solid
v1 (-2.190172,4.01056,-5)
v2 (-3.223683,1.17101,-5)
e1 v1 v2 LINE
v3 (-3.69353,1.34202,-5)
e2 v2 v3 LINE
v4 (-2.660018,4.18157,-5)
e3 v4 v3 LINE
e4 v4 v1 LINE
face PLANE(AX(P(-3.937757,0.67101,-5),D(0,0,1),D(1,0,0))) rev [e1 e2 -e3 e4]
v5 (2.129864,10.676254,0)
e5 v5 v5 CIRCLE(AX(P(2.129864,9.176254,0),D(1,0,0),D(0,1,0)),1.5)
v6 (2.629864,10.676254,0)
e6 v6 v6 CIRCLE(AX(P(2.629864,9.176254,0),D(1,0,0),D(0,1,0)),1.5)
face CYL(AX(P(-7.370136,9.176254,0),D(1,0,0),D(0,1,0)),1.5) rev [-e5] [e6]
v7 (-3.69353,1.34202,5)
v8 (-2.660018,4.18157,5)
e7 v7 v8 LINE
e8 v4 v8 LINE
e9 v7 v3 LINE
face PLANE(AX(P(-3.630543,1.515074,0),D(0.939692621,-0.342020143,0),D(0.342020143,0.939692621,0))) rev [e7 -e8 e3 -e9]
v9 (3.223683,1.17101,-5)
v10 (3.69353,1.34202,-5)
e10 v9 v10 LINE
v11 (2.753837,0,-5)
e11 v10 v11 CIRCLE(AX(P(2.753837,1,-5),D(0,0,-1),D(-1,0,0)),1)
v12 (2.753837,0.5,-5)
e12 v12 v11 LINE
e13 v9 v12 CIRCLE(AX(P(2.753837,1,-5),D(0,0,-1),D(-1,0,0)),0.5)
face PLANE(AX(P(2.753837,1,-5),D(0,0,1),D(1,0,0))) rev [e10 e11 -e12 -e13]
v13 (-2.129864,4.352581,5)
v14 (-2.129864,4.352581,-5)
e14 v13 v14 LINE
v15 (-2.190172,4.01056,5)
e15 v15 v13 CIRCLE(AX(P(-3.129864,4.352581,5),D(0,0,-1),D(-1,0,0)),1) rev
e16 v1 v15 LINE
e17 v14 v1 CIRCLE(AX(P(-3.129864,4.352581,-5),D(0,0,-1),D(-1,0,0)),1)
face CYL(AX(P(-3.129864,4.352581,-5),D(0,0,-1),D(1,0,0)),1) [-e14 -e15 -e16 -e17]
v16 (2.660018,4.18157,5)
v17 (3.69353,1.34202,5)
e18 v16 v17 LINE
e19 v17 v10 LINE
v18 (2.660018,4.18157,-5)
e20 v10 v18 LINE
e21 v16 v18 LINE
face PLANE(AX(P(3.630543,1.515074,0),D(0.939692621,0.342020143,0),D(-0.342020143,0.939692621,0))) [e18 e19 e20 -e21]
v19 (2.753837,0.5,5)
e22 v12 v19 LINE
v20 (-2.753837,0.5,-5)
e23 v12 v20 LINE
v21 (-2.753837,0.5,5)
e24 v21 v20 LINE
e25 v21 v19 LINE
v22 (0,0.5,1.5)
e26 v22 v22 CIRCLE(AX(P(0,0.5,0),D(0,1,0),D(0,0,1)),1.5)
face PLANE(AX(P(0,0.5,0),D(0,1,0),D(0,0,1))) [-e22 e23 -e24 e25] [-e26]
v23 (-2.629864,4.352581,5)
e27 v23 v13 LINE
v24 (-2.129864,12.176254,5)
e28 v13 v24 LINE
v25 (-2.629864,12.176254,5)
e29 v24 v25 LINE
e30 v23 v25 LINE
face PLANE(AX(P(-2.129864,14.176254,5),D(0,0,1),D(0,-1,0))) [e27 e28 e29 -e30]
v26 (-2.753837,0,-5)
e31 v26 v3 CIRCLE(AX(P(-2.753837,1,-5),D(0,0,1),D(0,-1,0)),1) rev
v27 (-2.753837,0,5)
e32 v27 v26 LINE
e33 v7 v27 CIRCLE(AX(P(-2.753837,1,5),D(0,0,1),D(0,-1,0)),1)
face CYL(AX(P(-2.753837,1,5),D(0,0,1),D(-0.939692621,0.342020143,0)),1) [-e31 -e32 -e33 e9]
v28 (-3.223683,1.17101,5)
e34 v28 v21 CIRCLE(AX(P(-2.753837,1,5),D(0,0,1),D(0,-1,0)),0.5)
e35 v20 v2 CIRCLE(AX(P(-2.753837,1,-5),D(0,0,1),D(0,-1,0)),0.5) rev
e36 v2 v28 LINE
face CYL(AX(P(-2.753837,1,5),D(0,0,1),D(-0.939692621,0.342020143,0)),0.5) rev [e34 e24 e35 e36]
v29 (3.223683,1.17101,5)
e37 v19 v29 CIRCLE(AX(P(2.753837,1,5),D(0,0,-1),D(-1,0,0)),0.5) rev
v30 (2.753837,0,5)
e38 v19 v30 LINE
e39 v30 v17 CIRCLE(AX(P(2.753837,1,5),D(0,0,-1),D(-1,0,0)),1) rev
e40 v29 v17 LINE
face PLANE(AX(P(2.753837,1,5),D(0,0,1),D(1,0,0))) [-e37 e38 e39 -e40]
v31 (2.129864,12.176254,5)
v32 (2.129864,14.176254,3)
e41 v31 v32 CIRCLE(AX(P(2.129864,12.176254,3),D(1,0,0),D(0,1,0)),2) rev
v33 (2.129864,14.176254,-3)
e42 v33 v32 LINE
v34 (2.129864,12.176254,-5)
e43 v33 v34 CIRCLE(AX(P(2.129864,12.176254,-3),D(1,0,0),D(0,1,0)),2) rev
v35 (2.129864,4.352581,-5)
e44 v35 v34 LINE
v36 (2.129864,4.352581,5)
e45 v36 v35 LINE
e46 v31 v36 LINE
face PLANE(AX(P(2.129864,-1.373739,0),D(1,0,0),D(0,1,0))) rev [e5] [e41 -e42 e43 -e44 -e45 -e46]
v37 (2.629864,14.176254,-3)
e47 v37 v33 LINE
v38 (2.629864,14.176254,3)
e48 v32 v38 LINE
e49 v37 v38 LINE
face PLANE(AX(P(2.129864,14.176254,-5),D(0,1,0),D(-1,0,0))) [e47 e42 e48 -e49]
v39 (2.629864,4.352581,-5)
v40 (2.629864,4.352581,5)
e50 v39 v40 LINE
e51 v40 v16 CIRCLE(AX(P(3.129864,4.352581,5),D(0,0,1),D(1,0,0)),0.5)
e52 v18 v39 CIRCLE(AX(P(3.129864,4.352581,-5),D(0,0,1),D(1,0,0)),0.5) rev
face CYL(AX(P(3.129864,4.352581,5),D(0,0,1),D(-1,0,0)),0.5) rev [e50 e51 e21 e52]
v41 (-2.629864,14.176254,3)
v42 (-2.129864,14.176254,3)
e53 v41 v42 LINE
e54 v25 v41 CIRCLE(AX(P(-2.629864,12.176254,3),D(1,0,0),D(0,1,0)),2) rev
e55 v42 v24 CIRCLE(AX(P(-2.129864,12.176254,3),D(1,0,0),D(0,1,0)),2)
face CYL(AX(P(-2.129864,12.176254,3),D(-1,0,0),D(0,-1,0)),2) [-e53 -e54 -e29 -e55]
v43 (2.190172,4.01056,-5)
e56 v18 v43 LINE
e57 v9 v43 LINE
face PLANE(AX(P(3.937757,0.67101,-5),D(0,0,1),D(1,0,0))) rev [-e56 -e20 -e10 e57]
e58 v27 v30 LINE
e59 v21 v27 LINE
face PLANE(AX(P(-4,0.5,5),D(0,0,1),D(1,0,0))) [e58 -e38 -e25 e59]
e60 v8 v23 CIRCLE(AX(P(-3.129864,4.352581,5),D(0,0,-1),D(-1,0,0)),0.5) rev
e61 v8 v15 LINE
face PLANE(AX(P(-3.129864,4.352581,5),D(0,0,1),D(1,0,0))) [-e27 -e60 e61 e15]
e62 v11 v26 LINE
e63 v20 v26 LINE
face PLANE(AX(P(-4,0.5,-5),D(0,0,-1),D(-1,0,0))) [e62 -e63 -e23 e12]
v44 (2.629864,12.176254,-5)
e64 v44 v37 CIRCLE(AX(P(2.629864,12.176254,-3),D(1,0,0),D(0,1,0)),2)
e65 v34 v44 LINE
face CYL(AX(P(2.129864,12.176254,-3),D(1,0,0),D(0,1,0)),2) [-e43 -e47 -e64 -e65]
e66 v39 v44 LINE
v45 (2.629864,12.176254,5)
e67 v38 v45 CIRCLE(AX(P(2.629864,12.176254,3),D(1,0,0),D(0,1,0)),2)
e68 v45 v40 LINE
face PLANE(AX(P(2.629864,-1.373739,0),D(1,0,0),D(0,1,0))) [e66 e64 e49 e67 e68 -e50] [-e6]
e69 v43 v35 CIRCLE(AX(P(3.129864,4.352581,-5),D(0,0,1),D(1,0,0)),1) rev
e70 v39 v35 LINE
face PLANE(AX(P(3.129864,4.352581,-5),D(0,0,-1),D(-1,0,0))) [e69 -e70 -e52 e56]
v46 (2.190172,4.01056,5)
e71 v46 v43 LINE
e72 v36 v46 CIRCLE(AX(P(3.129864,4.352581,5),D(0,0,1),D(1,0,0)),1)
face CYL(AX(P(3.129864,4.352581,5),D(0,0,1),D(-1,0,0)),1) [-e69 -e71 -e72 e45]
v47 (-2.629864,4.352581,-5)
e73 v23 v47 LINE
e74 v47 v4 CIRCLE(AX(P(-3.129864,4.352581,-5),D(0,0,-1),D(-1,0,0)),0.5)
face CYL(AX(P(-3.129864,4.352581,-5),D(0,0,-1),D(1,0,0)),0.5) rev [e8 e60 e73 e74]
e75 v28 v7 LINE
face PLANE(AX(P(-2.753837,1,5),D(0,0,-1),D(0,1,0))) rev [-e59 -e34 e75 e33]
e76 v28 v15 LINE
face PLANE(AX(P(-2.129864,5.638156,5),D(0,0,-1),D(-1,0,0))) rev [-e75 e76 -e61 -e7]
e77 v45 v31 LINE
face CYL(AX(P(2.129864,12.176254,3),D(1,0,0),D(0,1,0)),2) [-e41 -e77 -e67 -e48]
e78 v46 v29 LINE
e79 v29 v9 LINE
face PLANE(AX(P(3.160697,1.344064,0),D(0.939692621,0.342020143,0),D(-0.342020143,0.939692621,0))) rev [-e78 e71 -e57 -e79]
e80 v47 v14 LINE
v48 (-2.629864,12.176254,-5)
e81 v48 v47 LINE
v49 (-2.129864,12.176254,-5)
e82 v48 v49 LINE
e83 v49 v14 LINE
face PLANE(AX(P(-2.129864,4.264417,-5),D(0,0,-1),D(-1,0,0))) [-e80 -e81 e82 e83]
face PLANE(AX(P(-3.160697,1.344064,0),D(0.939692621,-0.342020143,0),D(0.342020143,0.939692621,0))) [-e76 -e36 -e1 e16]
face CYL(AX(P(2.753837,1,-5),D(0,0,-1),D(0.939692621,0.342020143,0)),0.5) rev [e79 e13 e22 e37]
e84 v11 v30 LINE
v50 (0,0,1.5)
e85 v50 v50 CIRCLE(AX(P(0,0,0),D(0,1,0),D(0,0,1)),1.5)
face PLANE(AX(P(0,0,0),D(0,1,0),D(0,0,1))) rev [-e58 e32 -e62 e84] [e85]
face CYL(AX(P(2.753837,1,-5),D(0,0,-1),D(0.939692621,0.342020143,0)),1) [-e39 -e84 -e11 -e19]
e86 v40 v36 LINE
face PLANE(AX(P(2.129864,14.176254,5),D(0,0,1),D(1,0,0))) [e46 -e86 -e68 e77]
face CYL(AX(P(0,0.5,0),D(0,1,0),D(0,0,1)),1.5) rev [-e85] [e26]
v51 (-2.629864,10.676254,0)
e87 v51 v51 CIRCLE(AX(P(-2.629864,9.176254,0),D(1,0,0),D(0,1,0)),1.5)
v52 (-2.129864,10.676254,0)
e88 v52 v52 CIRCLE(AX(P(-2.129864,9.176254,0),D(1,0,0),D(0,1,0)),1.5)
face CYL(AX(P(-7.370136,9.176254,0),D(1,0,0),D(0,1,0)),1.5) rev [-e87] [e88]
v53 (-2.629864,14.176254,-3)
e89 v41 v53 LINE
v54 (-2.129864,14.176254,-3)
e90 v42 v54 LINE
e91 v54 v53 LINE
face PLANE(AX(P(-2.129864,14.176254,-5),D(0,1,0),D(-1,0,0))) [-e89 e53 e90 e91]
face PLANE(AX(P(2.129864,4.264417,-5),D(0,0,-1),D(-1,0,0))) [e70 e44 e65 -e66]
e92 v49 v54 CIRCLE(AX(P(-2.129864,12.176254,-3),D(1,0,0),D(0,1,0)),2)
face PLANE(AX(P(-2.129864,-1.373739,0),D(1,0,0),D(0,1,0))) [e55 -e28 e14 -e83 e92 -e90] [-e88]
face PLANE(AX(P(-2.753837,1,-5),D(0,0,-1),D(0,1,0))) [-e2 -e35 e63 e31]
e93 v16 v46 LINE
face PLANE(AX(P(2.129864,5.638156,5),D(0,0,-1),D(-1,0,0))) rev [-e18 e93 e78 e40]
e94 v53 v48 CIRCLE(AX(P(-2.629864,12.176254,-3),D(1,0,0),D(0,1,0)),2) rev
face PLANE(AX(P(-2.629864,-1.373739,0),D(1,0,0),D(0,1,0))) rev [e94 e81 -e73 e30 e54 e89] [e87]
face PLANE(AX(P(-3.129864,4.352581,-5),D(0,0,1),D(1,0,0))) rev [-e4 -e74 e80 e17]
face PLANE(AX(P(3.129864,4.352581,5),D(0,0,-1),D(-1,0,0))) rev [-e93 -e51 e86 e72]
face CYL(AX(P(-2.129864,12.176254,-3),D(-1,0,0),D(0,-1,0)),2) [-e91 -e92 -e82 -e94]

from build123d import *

# Parameters (mm, degrees)
SKETCH_1_W               = 8
SKETCH_1_H               = 10
SKETCH_1_R               = 1.5
EXTRUDE_1_DEPTH          = 0.5
SM_START                 = -5
SM_EDGE_FLANGE_1_DEPTH   = 10
SM_EDGE_FLANGE_1_2_DEPTH = 10
SM_EDGE_FLANGE_2_DEPTH   = 10
SM_EDGE_FLANGE_2_2_DEPTH = 10
FILLET_1_R               = 2
SKETCH_18_R              = 1.5
CUT_EXTRUDE_1_DEPTH      = 10


# Read off the part's stored shape, not the designer's step: Ребро-кромка1, Ребро-кромка2
with BuildPart() as part:
    # Sketch 1 → Бобышка-Вытянуть1 (new body)
    with BuildSketch(Plane(origin=(0, 0, 0), x_dir=(1, 0, 0), z_dir=(0, 1, 0))):
        Rectangle(SKETCH_1_W, SKETCH_1_H)
        with Locations(Location((0, 0, 0), (0, 0, 270))):
            Circle(SKETCH_1_R, mode=Mode.SUBTRACT)
    extrude(amount=EXTRUDE_1_DEPTH)

    # Ребро-кромка1 outline → Ребро-кромка1 (cut)
    with BuildSketch(Plane.XY.offset(SM_START)):
        with BuildLine():
            ThreePointArc((-2.75383711, 0), (-3.25383711, 0.133974596), (-3.619862514, 0.5))
            Line((-3.619862514, 0.5), (-4, 0.5))
            Line((-4, 0.5), (-4, 0))
            Line((-4, 0), (-2.75383711, 0))
        make_face()
        with BuildLine():
            ThreePointArc((3.619862514, 0.5), (3.25383711, 0.133974596), (2.75383711, 0))
            Line((2.75383711, 0), (4, 0))
            Line((4, 0), (4, 0.5))
            Line((4, 0.5), (3.619862514, 0.5))
        make_face()
    extrude(amount=SM_EDGE_FLANGE_1_DEPTH, mode=Mode.SUBTRACT)

    # Sm Edge Flange 1 2 outline → Sm Edge Flange 1 2 (add)
    with BuildSketch(Plane.XY.offset(SM_START)):
        with BuildLine():
            Line((-2.129864257, 5.638155725), (-3.693529731, 1.342020143))
            ThreePointArc((-3.693529731, 1.342020143), (-3.750031808, 0.912844257), (-3.619862514, 0.5))
            Line((-3.619862514, 0.5), (-2.75383711, 0.5))
            ThreePointArc((-2.75383711, 0.5), (-3.163413133, 0.713211782), (-3.223683421, 1.171010072))
            Line((-3.223683421, 1.171010072), (-1.660017947, 5.467145653))
            Line((-1.660017947, 5.467145653), (-2.129864257, 5.638155725))
        make_face()
        with BuildLine():
            ThreePointArc((3.223683421, 1.171010072), (3.163413133, 0.713211782), (2.75383711, 0.5))
            Line((2.75383711, 0.5), (3.619862514, 0.5))
            ThreePointArc((3.619862514, 0.5), (3.750031808, 0.912844257), (3.693529731, 1.342020143))
            Line((3.693529731, 1.342020143), (2.129864257, 5.638155725))
            Line((2.129864257, 5.638155725), (1.660017947, 5.467145653))
            Line((1.660017947, 5.467145653), (3.223683421, 1.171010072))
        make_face()
    extrude(amount=SM_EDGE_FLANGE_1_2_DEPTH)

    # Ребро-кромка2 outline → Ребро-кромка2 (cut)
    with BuildSketch(Plane.XY.offset(SM_START)):
        with BuildLine():
            Line((-2.129864257, 5.638155725), (-2.129864257, 4.352580505))
            ThreePointArc((-2.129864257, 4.352580505), (-2.145056504, 4.178932328), (-2.190171636, 4.010560362))
            Line((-2.190171636, 4.010560362), (-1.660017947, 5.467145653))
            Line((-1.660017947, 5.467145653), (-2.129864257, 5.638155725))
        make_face()
        with BuildLine():
            Line((2.129864257, 4.352580505), (2.129864257, 5.638155725))
            Line((2.129864257, 5.638155725), (1.660017947, 5.467145653))
            Line((1.660017947, 5.467145653), (2.190171636, 4.010560362))
            ThreePointArc((2.190171636, 4.010560362), (2.145056504, 4.178932328), (2.129864257, 4.352580505))
        make_face()
    extrude(amount=SM_EDGE_FLANGE_2_DEPTH, mode=Mode.SUBTRACT)

    # Sm Edge Flange 2 2 outline → Sm Edge Flange 2 2 (add)
    with BuildSketch(Plane.XY.offset(SM_START)):
        with BuildLine():
            Line((-2.660017947, 4.181570434), (-2.129864257, 5.638155725))
            Line((-2.129864257, 5.638155725), (-2.129864257, 14.176253525))
            Line((-2.129864257, 14.176253525), (-2.629864257, 14.176253525))
            Line((-2.629864257, 14.176253525), (-2.629864257, 4.352580505))
            ThreePointArc((-2.629864257, 4.352580505), (-2.637460381, 4.265756417), (-2.660017947, 4.181570434))
        make_face()
        with BuildLine():
            Line((2.629864257, 4.352580505), (2.629864257, 14.176253525))
            Line((2.629864257, 14.176253525), (2.129864257, 14.176253525))
            Line((2.129864257, 14.176253525), (2.129864257, 5.638155725))
            Line((2.129864257, 5.638155725), (2.660017947, 4.181570434))
            ThreePointArc((2.660017947, 4.181570434), (2.637460381, 4.265756417), (2.629864257, 4.352580505))
        make_face()
    extrude(amount=SM_EDGE_FLANGE_2_2_DEPTH)

    # Скругление1
    fillet_1_edges = [part.edges().sort_by_distance(p)[0] for p in [
        (-2.379864257, 14.176253525, 5),
        (-2.379864257, 14.176253525, -5),
        (2.379864257, 14.176253525, -5),
        (2.379864257, 14.176253525, 5),
    ]]
    fillet(fillet_1_edges, radius=FILLET_1_R)

    # Эскиз18 → Вырез-Вытянуть1 (cut)
    with BuildSketch(Plane(origin=(2.629864257, 0, 0), x_dir=(0, 0, -1), z_dir=(1, 0, 0))):
        with Locations(Location((0, 9.176253525, 0), (0, 0, 90))):
            Circle(SKETCH_18_R)
    extrude(amount=-CUT_EXTRUDE_1_DEPTH, mode=Mode.SUBTRACT)


solid = part.part
